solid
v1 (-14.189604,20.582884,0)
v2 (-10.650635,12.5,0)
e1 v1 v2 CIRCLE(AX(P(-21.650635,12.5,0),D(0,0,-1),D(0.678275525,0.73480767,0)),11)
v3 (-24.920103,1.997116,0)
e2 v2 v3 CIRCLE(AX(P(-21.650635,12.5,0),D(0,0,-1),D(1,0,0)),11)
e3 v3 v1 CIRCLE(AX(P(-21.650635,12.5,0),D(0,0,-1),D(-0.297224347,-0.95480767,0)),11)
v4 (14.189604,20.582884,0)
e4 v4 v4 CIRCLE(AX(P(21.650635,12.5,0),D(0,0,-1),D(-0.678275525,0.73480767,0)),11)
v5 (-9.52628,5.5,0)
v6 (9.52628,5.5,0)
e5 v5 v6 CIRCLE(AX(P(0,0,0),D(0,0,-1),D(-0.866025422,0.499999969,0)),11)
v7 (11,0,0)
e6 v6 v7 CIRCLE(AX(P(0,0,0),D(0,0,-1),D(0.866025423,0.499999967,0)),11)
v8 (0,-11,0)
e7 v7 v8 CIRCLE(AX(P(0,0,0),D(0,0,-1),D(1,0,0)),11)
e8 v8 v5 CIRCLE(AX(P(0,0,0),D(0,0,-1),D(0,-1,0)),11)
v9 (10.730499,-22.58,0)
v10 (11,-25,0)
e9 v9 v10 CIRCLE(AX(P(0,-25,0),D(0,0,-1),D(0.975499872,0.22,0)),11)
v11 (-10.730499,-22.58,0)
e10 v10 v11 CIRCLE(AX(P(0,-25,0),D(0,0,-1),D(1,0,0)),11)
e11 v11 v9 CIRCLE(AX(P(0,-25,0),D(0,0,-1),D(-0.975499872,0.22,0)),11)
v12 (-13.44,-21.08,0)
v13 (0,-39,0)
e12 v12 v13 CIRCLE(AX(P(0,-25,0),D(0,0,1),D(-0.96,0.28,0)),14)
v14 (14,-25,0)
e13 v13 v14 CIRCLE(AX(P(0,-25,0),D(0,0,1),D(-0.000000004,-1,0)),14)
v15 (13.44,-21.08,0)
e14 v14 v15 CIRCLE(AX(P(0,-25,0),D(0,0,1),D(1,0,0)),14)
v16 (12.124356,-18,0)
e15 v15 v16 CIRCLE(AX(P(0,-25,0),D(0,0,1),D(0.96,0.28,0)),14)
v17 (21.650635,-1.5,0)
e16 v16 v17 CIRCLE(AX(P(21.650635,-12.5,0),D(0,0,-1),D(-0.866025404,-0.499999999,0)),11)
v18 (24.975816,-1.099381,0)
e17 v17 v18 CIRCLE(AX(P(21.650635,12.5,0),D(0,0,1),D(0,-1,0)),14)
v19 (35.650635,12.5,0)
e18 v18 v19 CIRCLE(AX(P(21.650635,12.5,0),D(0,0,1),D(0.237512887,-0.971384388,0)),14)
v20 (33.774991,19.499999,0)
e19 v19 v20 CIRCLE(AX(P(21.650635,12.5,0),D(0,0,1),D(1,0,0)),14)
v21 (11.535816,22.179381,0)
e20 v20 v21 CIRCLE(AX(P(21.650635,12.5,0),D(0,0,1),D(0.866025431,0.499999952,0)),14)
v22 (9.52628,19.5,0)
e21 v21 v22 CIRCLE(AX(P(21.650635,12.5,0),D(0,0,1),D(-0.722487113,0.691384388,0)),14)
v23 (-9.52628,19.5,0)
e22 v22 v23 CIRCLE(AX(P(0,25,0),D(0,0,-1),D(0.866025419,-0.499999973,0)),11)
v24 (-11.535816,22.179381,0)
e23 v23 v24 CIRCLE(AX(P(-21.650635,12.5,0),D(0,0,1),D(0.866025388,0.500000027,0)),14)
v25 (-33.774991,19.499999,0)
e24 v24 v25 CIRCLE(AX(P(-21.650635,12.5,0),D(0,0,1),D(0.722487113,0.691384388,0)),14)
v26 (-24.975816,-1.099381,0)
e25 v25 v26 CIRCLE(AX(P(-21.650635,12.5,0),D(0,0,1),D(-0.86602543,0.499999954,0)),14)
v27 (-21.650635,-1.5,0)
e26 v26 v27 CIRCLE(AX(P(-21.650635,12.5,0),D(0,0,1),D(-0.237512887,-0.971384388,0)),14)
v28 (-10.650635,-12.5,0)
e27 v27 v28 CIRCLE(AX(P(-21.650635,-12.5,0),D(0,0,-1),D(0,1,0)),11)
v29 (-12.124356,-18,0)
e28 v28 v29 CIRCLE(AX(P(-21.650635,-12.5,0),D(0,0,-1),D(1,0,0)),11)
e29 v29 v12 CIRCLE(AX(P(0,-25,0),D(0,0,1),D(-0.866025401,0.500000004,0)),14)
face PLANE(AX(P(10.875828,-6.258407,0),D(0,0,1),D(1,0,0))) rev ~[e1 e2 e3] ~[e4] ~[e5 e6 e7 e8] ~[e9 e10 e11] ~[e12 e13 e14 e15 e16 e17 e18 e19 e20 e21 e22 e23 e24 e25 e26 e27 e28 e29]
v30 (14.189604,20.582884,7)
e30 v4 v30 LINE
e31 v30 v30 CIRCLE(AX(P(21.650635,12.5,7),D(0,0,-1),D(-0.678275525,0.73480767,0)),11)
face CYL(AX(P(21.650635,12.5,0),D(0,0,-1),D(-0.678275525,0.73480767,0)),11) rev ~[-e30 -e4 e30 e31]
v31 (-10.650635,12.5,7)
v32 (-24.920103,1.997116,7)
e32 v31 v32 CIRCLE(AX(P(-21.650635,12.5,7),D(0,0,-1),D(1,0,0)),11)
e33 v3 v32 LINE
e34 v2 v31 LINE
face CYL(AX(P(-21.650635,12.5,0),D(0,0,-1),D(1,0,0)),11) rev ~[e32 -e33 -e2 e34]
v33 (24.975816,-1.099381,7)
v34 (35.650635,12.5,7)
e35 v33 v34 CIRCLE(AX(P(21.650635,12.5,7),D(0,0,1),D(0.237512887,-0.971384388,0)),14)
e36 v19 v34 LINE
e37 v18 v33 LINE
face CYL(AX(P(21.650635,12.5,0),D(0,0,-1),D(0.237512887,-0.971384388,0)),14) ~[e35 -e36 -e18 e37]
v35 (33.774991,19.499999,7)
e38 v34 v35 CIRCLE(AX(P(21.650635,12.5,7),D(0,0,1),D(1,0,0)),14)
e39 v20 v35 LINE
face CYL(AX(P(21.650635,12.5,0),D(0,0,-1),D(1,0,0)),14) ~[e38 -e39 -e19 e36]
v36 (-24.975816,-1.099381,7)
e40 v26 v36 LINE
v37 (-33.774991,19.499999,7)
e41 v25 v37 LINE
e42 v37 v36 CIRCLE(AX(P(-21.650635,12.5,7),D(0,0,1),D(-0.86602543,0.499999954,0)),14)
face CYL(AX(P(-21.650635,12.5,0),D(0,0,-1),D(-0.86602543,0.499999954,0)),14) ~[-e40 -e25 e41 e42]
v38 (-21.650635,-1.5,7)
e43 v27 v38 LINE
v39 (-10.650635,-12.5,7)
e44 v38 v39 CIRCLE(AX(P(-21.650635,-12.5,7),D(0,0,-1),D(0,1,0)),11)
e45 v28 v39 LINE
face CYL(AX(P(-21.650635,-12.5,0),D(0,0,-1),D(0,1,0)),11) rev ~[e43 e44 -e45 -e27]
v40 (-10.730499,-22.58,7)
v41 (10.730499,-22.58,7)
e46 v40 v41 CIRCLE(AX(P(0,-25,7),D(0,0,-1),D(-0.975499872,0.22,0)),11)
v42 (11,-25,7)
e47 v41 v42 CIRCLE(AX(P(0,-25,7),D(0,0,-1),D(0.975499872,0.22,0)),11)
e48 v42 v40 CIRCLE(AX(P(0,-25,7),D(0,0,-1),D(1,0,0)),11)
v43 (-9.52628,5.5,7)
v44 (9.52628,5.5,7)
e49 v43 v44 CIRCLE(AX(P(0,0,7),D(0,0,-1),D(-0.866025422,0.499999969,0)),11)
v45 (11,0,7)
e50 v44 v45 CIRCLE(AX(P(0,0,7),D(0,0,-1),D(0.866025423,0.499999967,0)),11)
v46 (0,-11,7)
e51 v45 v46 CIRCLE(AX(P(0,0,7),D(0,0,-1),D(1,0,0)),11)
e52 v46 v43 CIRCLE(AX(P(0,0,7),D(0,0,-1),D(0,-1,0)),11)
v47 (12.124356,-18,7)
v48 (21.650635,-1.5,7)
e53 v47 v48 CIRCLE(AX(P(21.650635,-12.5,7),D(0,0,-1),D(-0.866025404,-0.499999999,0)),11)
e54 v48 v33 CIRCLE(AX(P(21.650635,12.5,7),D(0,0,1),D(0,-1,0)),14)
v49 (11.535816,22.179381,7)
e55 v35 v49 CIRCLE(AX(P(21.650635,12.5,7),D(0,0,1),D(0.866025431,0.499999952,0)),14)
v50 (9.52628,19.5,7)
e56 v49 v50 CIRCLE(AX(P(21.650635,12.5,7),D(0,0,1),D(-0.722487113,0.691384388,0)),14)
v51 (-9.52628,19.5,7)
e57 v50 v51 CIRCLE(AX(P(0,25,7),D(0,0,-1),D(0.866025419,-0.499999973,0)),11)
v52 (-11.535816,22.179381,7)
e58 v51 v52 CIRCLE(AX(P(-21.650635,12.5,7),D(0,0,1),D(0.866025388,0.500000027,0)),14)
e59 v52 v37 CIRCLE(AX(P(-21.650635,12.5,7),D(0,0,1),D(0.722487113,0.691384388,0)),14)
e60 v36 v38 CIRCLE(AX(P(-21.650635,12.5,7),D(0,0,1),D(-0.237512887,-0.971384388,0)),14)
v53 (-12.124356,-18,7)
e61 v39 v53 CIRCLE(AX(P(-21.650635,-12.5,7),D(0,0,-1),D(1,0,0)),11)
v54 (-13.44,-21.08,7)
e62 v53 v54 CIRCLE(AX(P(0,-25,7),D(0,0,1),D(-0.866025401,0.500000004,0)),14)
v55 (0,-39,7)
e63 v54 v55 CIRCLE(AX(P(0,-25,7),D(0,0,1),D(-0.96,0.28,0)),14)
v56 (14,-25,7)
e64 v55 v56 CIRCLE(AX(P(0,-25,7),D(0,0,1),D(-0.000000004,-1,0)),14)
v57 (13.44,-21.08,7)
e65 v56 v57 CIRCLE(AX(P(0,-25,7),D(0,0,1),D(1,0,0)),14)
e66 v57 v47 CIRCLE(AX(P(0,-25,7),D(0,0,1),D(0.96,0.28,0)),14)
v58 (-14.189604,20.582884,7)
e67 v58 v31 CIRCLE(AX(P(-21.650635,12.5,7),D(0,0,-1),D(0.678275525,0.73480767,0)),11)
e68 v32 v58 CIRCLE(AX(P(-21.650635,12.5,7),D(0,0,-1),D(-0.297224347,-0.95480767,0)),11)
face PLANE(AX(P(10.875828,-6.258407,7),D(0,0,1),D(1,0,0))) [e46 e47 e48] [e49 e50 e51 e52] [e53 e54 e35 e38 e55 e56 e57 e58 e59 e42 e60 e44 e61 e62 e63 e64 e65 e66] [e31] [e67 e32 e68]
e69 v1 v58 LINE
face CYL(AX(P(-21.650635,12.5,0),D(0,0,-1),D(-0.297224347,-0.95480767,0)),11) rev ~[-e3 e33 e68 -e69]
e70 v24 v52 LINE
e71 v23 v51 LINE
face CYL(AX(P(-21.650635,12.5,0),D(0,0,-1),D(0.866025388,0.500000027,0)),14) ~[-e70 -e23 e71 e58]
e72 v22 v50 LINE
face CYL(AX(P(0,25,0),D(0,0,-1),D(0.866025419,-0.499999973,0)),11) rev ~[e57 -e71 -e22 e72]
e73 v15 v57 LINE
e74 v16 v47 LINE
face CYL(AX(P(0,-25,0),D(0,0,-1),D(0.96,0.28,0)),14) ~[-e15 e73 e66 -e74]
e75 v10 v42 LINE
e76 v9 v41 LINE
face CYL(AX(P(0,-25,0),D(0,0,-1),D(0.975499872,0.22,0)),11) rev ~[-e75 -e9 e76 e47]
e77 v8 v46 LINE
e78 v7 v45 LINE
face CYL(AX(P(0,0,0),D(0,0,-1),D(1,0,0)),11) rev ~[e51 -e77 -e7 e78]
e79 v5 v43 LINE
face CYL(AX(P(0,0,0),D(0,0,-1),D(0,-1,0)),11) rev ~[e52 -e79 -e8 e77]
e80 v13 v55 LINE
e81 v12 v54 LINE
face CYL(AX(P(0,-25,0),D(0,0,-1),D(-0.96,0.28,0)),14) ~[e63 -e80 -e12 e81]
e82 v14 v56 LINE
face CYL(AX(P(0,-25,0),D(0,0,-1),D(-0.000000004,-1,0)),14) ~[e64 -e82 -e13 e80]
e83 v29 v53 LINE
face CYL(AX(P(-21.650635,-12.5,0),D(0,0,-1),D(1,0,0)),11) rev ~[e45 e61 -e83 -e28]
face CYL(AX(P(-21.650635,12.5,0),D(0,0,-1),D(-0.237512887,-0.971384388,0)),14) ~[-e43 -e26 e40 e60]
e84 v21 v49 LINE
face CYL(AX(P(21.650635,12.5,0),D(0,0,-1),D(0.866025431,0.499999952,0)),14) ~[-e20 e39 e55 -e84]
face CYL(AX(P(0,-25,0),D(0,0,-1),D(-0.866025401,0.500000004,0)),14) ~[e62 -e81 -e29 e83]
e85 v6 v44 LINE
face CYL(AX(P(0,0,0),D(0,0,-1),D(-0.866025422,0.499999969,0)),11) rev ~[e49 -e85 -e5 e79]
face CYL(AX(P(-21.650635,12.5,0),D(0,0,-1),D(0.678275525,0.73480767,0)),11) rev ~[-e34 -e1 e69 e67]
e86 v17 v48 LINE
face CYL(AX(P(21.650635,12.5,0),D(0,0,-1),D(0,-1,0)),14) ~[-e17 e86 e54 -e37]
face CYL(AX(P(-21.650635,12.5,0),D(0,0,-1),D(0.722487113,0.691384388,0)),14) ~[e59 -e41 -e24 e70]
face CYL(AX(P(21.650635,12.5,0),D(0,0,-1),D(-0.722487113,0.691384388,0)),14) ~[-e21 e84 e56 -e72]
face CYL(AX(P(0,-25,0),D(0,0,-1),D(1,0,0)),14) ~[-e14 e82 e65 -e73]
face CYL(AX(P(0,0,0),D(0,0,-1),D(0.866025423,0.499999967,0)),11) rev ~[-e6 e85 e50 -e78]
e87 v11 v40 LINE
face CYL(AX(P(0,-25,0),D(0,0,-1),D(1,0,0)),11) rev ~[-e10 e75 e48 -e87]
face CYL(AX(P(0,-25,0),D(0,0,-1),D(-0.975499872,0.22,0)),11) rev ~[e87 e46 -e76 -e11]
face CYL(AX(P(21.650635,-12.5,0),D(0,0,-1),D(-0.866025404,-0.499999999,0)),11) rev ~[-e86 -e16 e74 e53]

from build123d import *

# Parameters (mm, degrees)
F1_DEPTH = 7


# Not quite as in the source:
# - a feature names something its author has since deleted; it is built from what else it names


with BuildPart() as f1:
    # F0 (on Top) → F1 (new body)
    with BuildSketch(Plane.XY):
        with BuildLine():
            ThreePointArc((9.5262796516, 5.4999996362), (10.6251841435, 2.8470092933), (11, 0))
            ThreePointArc((11, 0), (7.7781745931, -7.7781745931), (0, -11))
            ThreePointArc((0, -11), (6.9999999972, -12.8756443454), (12.1243556497, -17.9999999943))
            ThreePointArc((12.1243556497, -17.9999999943), (12.1243556546, -6.9999999972), (21.6506350946, -1.5))
            ThreePointArc((21.6506350946, -1.5), (14.6506352765, 0.375644242), (9.5262796516, 5.4999996362))
        make_face()
        with BuildLine():
            ThreePointArc((-9.5262796375, 5.4999996607), (1.41e-08, 11), (9.5262796516, 5.4999996362))
            ThreePointArc((9.5262796516, 5.4999996362), (7.6506350946, 12.4999999615), (9.5262796131, 19.500000297))
            ThreePointArc((9.5262796131, 19.500000297), (-4.54e-08, 14), (-9.5262796585, 19.5000003756))
            ThreePointArc((-9.5262796585, 19.5000003756), (-8.1276735827, 16.1234668409), (-7.6506350946, 12.5))
            ThreePointArc((-7.6506350946, 12.5), (-8.1276735773, 8.8765331793), (-9.5262796375, 5.4999996607))
        make_face()
        with BuildLine():
            ThreePointArc((9.5262796131, 19.500000297), (7.6506350946, 12.4999999615), (9.5262796516, 5.4999996362))
            ThreePointArc((9.5262796516, 5.4999996362), (14.6506352765, 0.375644242), (21.6506350946, -1.5))
            ThreePointArc((21.6506350946, -1.5), (23.3252484864, -1.3994845224), (24.9758155118, -1.0993814269))
            ThreePointArc((24.9758155118, -1.0993814269), (24.9939531467, -0.5498237016), (25, 0))
            ThreePointArc((25, 0), (24.9800177424, 0.9993565887), (24.9201029127, 1.9971156254))
            ThreePointArc((24.9201029127, 1.9971156254), (12.124355653, 7), (14.1896043222, 20.5828843746))
            ThreePointArc((14.1896043222, 20.5828843746), (12.8874554167, 21.4222662872), (11.5358155118, 22.1793814269))
            ThreePointArc((11.5358155118, 22.1793814269), (10.4506351975, 20.9000001372), (9.5262796131, 19.500000297))
        make_face()
        with BuildLine():
            ThreePointArc((-12.1243556177, -17.999999939), (-6.9999999695, -12.8756443294), (0, -11))
            ThreePointArc((0, -11), (-9.5262793437, -5.5000001697), (-9.5262796375, 5.4999996607))
            ThreePointArc((-9.5262796375, 5.4999996607), (-14.6506352643, 0.3756442491), (-21.6506350946, -1.5))
            ThreePointArc((-21.6506350946, -1.5), (-13.8724605016, -4.7218254069), (-10.6506350946, -12.5))
            ThreePointArc((-10.6506350946, -12.5), (-11.0254509963, -15.3470094621), (-12.1243556177, -17.999999939))
        make_face()
        with BuildLine():
            ThreePointArc((12.1243556497, -17.9999999943), (6.9999999972, -12.8756443454), (0, -11))
            ThreePointArc((0, -11), (-6.9999999695, -12.8756443294), (-12.1243556177, -17.999999939))
            ThreePointArc((-12.1243556177, -17.999999939), (-12.8746133779, -19.5005154452), (-13.44, -21.08))
            ThreePointArc((-13.44, -21.08), (-12.108499103, -21.8719969247), (-10.7304985905, -22.58))
            ThreePointArc((-10.7304985905, -22.58), (0, -14), (10.7304985905, -22.58))
            ThreePointArc((10.7304985905, -22.58), (12.108499103, -21.8719969247), (13.44, -21.08))
            ThreePointArc((13.44, -21.08), (12.8746133905, -19.5005154746), (12.1243556497, -17.9999999943))
        make_face()
        with BuildLine():
            ThreePointArc((-21.6506350946, -1.5), (-14.6506352643, 0.3756442491), (-9.5262796375, 5.4999996607))
            ThreePointArc((-9.5262796375, 5.4999996607), (-8.1276735773, 8.8765331793), (-7.6506350946, 12.5))
            ThreePointArc((-7.6506350946, 12.5), (-8.1276735827, 16.1234668409), (-9.5262796585, 19.5000003756))
            ThreePointArc((-9.5262796585, 19.5000003756), (-10.4506352247, 20.9000001735), (-11.5358155118, 22.1793814269))
            ThreePointArc((-11.5358155118, 22.1793814269), (-12.8874554167, 21.4222662872), (-14.1896043222, 20.5828843746))
            ThreePointArc((-14.1896043222, 20.5828843746), (-11.5741441752, 16.9118398375), (-10.6506350946, 12.5))
            ThreePointArc((-10.6506350946, 12.5), (-15.1300578962, 3.6409891636), (-24.9201029127, 1.9971156254))
            ThreePointArc((-24.9201029127, 1.9971156254), (-24.9959545198, 0.4497306374), (-24.9758155118, -1.0993814269))
            ThreePointArc((-24.9758155118, -1.0993814269), (-23.3252484864, -1.3994845224), (-21.6506350946, -1.5))
        make_face()
        with BuildLine():
            ThreePointArc((33.7749911327, 19.499999333), (23.3252488687, 26.3994844763), (11.5358155118, 22.1793814269))
            ThreePointArc((11.5358155118, 22.1793814269), (12.8874554167, 21.4222662872), (14.1896043222, 20.5828843746))
            ThreePointArc((14.1896043222, 20.5828843746), (26.0624749321, 22.5764909194), (32.6506350946, 12.5))
            ThreePointArc((32.6506350946, 12.5), (30.509645931, 5.9794228016), (24.9201029127, 1.9971156254))
            ThreePointArc((24.9201029127, 1.9971156254), (24.9800177424, 0.9993565887), (25, 0))
            ThreePointArc((25, 0), (24.9939531467, -0.5498237016), (24.9758155118, -1.0993814269))
            ThreePointArc((24.9758155118, -1.0993814269), (32.6631853406, 3.8557107244), (35.6506350946, 12.5))
            ThreePointArc((35.6506350946, 12.5), (35.1735967623, 16.1234662595), (33.7749911327, 19.499999333))
        make_face()
        with BuildLine():
            ThreePointArc((14, -25), (13.8592929113, -23.0201010127), (13.44, -21.08))
            ThreePointArc((13.44, -21.08), (12.108499103, -21.8719969247), (10.7304985905, -22.58))
            ThreePointArc((10.7304985905, -22.58), (10.9324170359, -23.782519917), (11, -25))
            ThreePointArc((11, -25), (-1.217480083, -35.9324170359), (-10.7304985905, -22.58))
            ThreePointArc((-10.7304985905, -22.58), (-12.108499103, -21.8719969247), (-13.44, -21.08))
            ThreePointArc((-13.44, -21.08), (-11.2000000155, -33.3999999793), (-5.18e-08, -39))
            ThreePointArc((-5.18e-08, -39), (9.8994949183, -34.8994949549), (14, -25))
        make_face()
        with BuildLine():
            ThreePointArc((-33.7749911175, 19.4999993593), (-34.5252483411, 7.0005151375), (-24.9758155118, -1.0993814269))
            ThreePointArc((-24.9758155118, -1.0993814269), (-24.9959545198, 0.4497306374), (-24.9201029127, 1.9971156254))
            ThreePointArc((-24.9201029127, 1.9971156254), (-31.1769145362, 18), (-14.1896043222, 20.5828843746))
            ThreePointArc((-14.1896043222, 20.5828843746), (-12.8874554167, 21.4222662872), (-11.5358155118, 22.1793814269))
            ThreePointArc((-11.5358155118, 22.1793814269), (-23.3252488536, 26.3994844781), (-33.7749911175, 19.4999993593))
        make_face()
    extrude(amount=F1_DEPTH)


solid = f1.part
